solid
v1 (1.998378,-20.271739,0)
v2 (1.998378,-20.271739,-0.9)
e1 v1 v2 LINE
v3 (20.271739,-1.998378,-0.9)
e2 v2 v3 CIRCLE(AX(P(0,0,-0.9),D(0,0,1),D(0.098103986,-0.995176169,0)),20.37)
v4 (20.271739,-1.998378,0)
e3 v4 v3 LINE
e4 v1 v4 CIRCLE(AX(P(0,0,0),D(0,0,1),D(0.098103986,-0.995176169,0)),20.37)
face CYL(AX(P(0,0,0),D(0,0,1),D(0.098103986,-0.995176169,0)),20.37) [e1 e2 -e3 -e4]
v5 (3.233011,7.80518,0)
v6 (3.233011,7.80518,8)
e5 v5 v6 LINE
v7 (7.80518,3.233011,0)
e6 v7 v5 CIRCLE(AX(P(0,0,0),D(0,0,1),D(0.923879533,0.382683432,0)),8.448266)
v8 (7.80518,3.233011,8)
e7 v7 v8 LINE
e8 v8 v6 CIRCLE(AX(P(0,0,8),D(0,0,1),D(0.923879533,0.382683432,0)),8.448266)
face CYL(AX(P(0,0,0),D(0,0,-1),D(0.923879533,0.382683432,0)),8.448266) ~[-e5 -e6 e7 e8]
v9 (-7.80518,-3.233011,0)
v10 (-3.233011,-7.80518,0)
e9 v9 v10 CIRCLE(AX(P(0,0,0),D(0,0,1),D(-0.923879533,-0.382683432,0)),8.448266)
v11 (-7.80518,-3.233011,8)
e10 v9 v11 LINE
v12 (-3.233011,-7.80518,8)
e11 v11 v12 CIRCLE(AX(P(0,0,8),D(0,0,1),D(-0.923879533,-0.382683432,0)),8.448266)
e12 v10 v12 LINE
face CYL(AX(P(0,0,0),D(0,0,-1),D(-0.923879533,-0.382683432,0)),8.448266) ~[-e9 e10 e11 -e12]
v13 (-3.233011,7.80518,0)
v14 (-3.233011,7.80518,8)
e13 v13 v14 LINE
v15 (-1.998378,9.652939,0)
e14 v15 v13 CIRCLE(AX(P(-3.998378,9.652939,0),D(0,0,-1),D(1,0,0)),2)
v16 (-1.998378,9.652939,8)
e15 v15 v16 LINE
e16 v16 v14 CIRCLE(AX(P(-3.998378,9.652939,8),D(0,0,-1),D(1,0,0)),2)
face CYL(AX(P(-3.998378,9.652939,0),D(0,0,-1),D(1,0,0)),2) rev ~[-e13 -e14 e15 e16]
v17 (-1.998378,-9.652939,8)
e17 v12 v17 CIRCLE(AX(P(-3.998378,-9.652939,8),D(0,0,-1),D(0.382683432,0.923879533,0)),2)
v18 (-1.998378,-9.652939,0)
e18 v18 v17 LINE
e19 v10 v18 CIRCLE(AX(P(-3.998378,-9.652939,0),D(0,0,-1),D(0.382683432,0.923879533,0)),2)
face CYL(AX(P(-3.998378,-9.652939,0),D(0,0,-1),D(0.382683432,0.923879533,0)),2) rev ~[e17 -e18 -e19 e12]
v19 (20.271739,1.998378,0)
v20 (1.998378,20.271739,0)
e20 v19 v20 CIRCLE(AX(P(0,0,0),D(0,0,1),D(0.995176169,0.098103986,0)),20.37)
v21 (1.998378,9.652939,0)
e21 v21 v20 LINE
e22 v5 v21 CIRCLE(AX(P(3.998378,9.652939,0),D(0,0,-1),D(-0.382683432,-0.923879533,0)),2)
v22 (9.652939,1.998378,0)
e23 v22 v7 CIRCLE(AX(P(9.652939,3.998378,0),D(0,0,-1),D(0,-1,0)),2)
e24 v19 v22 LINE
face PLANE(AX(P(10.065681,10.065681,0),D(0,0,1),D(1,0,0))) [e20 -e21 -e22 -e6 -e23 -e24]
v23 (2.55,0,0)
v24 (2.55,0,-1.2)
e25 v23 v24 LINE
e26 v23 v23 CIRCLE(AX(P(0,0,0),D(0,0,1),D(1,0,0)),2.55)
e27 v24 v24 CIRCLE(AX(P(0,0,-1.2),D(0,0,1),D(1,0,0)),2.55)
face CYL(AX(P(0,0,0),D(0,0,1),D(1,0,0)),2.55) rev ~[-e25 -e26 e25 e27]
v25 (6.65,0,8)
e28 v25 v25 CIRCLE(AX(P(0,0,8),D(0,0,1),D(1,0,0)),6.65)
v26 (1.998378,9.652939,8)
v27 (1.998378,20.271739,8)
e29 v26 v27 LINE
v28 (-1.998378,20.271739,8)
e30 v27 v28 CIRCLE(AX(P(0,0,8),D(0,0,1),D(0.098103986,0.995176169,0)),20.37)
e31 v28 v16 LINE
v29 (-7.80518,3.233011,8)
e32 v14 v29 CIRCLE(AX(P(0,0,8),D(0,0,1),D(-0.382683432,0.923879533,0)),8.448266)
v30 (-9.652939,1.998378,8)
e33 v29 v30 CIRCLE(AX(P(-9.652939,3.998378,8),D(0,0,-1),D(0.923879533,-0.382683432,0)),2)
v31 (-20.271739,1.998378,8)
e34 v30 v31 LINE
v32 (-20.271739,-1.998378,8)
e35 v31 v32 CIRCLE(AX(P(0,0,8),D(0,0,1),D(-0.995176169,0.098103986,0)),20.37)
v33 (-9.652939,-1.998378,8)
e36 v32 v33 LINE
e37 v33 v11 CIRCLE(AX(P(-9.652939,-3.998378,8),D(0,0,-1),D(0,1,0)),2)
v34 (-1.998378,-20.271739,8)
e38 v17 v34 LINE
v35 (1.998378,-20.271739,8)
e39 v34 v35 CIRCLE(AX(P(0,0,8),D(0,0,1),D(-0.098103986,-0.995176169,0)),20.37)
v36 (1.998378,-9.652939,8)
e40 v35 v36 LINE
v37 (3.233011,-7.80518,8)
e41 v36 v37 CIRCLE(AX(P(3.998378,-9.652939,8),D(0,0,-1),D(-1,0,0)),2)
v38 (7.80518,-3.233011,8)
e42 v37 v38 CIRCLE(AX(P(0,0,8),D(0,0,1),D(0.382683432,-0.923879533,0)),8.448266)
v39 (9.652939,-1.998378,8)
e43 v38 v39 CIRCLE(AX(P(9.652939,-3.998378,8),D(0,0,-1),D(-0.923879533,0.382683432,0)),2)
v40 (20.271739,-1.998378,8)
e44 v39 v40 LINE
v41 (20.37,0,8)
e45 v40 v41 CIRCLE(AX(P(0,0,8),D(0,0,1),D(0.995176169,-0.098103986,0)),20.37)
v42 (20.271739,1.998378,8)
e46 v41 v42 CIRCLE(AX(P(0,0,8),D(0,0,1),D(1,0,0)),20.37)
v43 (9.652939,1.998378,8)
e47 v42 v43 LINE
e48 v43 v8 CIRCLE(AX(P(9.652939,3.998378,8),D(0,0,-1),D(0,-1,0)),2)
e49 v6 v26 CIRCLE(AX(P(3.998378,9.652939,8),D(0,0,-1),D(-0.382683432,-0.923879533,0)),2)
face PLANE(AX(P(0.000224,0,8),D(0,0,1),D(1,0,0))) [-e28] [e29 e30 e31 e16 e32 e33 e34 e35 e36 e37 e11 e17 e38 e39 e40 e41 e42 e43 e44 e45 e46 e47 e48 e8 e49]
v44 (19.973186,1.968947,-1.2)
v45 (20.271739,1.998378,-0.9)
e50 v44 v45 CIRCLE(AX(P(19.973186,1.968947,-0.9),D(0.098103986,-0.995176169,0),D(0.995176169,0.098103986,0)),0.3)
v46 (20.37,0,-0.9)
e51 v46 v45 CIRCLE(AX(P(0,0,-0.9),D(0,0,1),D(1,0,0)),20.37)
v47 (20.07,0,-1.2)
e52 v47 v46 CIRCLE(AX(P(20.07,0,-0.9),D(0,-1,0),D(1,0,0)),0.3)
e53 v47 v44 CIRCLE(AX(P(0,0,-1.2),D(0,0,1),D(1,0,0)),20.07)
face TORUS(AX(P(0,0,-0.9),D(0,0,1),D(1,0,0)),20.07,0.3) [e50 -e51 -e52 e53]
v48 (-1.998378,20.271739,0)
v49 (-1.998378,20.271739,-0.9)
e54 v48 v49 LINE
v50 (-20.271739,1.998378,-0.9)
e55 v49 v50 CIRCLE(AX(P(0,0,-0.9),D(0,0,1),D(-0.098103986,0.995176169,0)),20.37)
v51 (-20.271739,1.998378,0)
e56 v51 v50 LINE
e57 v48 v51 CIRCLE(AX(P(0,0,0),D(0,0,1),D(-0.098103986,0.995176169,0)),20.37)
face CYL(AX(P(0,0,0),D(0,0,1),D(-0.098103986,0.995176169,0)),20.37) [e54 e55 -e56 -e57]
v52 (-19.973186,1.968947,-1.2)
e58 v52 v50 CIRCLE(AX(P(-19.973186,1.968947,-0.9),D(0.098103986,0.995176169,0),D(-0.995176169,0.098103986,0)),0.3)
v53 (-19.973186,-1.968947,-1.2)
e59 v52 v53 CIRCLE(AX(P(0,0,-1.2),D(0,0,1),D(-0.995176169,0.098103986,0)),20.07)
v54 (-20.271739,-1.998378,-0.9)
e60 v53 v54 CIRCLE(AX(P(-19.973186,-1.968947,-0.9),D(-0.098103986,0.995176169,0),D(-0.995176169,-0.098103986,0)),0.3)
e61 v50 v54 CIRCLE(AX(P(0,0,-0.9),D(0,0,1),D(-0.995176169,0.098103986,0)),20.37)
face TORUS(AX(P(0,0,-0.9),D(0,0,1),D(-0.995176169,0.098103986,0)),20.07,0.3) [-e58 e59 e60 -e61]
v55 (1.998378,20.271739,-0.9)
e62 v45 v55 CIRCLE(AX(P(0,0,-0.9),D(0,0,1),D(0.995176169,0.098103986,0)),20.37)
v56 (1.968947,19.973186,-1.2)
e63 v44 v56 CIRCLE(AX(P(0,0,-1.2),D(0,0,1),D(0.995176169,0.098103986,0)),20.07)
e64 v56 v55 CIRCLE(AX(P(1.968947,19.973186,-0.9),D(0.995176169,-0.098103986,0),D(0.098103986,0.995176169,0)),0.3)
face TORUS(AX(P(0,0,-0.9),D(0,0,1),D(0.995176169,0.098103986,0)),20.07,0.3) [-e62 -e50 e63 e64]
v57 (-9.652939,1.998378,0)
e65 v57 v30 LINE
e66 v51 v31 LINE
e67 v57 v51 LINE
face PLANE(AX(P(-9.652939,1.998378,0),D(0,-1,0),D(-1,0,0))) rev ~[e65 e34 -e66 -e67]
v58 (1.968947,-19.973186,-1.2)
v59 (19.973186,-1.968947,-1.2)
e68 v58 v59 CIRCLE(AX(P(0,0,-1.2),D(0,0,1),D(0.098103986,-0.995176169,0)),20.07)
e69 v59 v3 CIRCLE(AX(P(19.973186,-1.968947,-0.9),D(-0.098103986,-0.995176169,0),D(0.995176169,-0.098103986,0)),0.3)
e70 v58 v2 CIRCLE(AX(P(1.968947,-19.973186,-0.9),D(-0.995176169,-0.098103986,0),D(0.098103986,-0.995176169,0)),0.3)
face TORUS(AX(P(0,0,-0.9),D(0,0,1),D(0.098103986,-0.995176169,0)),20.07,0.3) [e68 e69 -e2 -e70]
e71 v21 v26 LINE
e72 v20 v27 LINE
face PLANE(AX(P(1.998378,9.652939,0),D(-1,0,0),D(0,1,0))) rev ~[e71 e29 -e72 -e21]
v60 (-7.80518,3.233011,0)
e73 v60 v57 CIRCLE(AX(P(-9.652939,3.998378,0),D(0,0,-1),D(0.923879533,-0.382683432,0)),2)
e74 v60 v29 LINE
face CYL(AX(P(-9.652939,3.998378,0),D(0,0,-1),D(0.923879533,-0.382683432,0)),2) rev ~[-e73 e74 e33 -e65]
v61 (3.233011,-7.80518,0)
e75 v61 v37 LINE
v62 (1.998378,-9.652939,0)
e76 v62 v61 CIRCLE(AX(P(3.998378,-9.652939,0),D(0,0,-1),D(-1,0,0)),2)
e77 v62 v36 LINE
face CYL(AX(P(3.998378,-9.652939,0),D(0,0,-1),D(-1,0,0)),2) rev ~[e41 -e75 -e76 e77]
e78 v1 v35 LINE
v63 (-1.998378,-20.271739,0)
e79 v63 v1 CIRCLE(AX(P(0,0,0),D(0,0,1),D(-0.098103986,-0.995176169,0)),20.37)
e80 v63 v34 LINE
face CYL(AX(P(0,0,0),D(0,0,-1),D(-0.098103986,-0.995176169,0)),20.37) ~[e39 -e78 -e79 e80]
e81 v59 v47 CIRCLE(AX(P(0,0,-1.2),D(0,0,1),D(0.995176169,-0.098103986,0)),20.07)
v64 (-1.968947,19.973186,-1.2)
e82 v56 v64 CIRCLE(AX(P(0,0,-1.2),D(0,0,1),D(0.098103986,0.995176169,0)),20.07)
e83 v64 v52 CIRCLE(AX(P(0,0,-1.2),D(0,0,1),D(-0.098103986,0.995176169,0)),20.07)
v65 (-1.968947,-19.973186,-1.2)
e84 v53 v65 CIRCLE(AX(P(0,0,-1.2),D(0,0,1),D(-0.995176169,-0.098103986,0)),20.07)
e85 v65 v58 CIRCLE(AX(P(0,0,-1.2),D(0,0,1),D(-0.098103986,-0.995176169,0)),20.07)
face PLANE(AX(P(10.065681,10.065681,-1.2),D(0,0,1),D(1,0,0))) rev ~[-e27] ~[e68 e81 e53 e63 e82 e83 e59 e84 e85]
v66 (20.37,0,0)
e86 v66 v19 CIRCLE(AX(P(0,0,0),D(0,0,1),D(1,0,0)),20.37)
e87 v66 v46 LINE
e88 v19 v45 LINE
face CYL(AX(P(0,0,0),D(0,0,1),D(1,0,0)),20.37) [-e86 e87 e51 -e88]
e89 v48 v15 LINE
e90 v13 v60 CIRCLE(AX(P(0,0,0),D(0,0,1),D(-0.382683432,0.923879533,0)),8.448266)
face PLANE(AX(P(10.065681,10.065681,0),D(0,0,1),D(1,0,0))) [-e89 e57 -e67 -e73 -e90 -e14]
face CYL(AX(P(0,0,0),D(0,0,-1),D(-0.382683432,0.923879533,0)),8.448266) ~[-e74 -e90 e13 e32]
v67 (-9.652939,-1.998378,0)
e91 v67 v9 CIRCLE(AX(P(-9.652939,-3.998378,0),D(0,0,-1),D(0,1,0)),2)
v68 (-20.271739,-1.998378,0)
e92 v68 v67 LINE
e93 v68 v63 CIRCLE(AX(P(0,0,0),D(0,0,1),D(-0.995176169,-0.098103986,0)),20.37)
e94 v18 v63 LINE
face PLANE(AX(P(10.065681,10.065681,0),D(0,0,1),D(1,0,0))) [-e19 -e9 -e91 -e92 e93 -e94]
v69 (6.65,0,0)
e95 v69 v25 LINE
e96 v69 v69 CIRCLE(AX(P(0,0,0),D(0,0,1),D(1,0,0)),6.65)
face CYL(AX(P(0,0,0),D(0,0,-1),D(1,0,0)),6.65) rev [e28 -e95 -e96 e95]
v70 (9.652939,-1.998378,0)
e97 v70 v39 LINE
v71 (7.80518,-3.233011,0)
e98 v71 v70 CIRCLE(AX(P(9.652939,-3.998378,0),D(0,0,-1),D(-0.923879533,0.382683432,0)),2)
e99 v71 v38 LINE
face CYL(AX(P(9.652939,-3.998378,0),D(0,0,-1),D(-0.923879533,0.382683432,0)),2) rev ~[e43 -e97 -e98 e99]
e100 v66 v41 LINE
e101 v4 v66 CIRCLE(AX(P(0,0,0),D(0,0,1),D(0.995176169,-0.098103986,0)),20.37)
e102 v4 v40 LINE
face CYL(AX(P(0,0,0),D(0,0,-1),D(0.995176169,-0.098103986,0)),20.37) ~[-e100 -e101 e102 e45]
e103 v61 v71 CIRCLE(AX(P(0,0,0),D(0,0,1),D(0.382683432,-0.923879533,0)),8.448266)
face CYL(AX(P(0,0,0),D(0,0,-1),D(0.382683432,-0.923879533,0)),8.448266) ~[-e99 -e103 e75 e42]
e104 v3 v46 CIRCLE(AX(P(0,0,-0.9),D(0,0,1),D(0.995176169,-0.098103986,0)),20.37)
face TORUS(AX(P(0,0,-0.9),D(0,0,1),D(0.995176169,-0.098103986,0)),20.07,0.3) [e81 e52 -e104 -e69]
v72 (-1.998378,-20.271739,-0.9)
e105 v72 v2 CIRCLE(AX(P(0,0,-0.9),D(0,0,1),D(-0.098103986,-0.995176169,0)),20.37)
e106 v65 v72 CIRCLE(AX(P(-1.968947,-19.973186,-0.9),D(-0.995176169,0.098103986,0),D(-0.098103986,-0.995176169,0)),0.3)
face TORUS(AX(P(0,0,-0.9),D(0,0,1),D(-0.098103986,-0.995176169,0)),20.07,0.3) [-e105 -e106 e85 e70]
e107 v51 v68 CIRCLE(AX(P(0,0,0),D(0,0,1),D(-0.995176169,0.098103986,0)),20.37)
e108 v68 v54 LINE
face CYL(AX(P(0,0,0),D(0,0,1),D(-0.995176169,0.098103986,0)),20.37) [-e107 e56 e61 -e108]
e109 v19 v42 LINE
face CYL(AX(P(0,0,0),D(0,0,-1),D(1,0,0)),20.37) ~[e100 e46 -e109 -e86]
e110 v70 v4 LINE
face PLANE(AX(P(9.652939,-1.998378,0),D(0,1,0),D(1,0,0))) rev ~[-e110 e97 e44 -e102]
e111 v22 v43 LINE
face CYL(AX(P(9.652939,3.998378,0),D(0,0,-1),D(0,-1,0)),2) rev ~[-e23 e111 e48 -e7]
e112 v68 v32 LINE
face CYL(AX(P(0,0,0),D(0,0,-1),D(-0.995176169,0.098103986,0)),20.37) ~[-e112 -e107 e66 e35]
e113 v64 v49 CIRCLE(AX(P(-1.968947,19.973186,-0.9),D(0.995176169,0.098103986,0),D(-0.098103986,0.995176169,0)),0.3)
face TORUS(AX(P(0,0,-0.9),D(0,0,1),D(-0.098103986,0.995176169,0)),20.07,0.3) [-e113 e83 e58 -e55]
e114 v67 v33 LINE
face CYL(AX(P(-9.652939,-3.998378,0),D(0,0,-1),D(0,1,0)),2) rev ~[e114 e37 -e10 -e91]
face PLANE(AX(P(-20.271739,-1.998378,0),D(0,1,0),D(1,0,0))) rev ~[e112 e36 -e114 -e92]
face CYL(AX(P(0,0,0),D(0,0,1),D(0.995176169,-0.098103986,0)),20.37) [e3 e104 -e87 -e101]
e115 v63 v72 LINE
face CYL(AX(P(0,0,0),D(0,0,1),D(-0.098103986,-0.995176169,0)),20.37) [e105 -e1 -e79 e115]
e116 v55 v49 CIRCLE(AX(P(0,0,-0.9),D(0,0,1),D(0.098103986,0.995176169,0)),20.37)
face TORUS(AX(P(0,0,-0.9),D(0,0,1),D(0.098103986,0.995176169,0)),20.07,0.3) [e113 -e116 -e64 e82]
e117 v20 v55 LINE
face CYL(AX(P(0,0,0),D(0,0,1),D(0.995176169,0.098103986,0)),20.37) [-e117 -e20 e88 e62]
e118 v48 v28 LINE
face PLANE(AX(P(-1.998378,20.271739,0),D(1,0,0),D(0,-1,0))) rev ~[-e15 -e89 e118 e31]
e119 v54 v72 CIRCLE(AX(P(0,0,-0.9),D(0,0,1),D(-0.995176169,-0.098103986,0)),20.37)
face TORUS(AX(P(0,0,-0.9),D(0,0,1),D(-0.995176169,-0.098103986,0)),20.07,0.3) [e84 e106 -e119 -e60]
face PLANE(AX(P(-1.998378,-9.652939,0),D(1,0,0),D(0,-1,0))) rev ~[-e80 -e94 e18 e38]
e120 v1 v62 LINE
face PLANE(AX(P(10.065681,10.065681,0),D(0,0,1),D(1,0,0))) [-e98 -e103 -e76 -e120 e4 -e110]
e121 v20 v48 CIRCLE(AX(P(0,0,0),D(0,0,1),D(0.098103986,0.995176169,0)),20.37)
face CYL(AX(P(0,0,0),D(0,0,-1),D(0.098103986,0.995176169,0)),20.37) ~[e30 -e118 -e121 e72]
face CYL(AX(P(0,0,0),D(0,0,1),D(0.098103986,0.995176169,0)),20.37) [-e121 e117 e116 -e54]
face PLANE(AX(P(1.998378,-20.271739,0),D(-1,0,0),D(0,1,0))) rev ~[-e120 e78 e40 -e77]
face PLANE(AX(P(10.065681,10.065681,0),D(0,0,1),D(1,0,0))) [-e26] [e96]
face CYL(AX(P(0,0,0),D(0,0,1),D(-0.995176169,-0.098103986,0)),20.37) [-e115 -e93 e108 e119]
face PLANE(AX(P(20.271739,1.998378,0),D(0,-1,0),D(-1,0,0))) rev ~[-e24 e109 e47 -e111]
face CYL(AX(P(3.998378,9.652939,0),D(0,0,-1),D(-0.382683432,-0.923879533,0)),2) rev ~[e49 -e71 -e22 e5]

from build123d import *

# Parameters (mm, degrees)
F0_R     = 6.65
F0_R_2   = 2.55
F1_DEPTH = 1.2
F2_DEPTH = 8
F3_R     = 0.3


# Not quite as in the source:
# - a feature names something its author has since deleted; it is built from what else it names


with BuildPart() as f1:
    # F0 (on Top) → F1 (new body)
    with BuildSketch(Plane.XY):
        with BuildLine():
            Line((9.6529388756, 1.998378199), (20.2717385681, 1.998378199))
            ThreePointArc((20.2717385681, 1.998378199), (14.4037651328, 14.4037651328), (1.998378199, 20.2717385681))
            Line((1.998378199, 20.2717385681), (1.998378199, 9.6529388756))
            ThreePointArc((1.998378199, 9.6529388756), (2.3354389744, 8.5417984096), (3.2330113343, 7.8051798106))
            ThreePointArc((3.2330113343, 7.8051798106), (5.9738260003, 5.9738260003), (7.8051798106, 3.2330113343))
            ThreePointArc((7.8051798106, 3.2330113343), (8.5417984096, 2.3354389744), (9.6529388756, 1.998378199))
        make_face()
        with BuildLine():
            Line((-1.998378199, 9.6529388756), (-1.998378199, 20.2717385681))
            ThreePointArc((-1.998378199, 20.2717385681), (-14.4037651328, 14.4037651328), (-20.2717385681, 1.998378199))
            Line((-20.2717385681, 1.998378199), (-9.6529388756, 1.998378199))
            ThreePointArc((-9.6529388756, 1.998378199), (-8.5417984096, 2.3354389744), (-7.8051798106, 3.2330113343))
            ThreePointArc((-7.8051798106, 3.2330113343), (-5.9738260003, 5.9738260003), (-3.2330113343, 7.8051798106))
            ThreePointArc((-3.2330113343, 7.8051798106), (-2.3354389744, 8.5417984096), (-1.998378199, 9.6529388756))
        make_face()
        with BuildLine():
            ThreePointArc((-20.2717385681, -1.998378199), (-14.4037651328, -14.4037651328), (-1.998378199, -20.2717385681))
            Line((-1.998378199, -20.2717385681), (-1.998378199, -9.6529388756))
            ThreePointArc((-1.998378199, -9.6529388756), (-2.3354389744, -8.5417984096), (-3.2330113343, -7.8051798106))
            ThreePointArc((-3.2330113343, -7.8051798106), (-5.9738260003, -5.9738260003), (-7.8051798106, -3.2330113343))
            ThreePointArc((-7.8051798106, -3.2330113343), (-8.5417984096, -2.3354389744), (-9.6529388756, -1.998378199))
            Line((-9.6529388756, -1.998378199), (-20.2717385681, -1.998378199))
        make_face()
        with BuildLine():
            ThreePointArc((1.998378199, -20.2717385681), (14.4037651328, -14.4037651328), (20.2717385681, -1.998378199))
            Line((20.2717385681, -1.998378199), (9.6529388756, -1.998378199))
            ThreePointArc((9.6529388756, -1.998378199), (8.5417984096, -2.3354389744), (7.8051798106, -3.2330113343))
            ThreePointArc((7.8051798106, -3.2330113343), (5.9738260003, -5.9738260003), (3.2330113343, -7.8051798106))
            ThreePointArc((3.2330113343, -7.8051798106), (2.3354389744, -8.5417984096), (1.998378199, -9.6529388756))
            Line((1.998378199, -9.6529388756), (1.998378199, -20.2717385681))
        make_face()
        with BuildLine():
            ThreePointArc((20.2717385681, -1.998378199), (20.3454198117, -1.0003962634), (20.37, 0))
            ThreePointArc((20.37, 0), (20.3454198117, 1.0003962634), (20.2717385681, 1.998378199))
            Line((20.2717385681, 1.998378199), (9.6529388756, 1.998378199))
            ThreePointArc((9.6529388756, 1.998378199), (8.5417984096, 2.3354389744), (7.8051798106, 3.2330113343))
            ThreePointArc((7.8051798106, 3.2330113343), (5.9738260003, 5.9738260003), (3.2330113343, 7.8051798106))
            ThreePointArc((3.2330113343, 7.8051798106), (2.3354389744, 8.5417984096), (1.998378199, 9.6529388756))
            Line((1.998378199, 9.6529388756), (1.998378199, 20.2717385681))
            ThreePointArc((1.998378199, 20.2717385681), (0, 20.37), (-1.998378199, 20.2717385681))
            Line((-1.998378199, 20.2717385681), (-1.998378199, 9.6529388756))
            ThreePointArc((-1.998378199, 9.6529388756), (-2.3354389744, 8.5417984096), (-3.2330113343, 7.8051798106))
            ThreePointArc((-3.2330113343, 7.8051798106), (-5.9738260003, 5.9738260003), (-7.8051798106, 3.2330113343))
            ThreePointArc((-7.8051798106, 3.2330113343), (-8.5417984096, 2.3354389744), (-9.6529388756, 1.998378199))
            Line((-9.6529388756, 1.998378199), (-20.2717385681, 1.998378199))
            ThreePointArc((-20.2717385681, 1.998378199), (-20.37, 0), (-20.2717385681, -1.998378199))
            Line((-20.2717385681, -1.998378199), (-9.6529388756, -1.998378199))
            ThreePointArc((-9.6529388756, -1.998378199), (-8.5417984096, -2.3354389744), (-7.8051798106, -3.2330113343))
            ThreePointArc((-7.8051798106, -3.2330113343), (-5.9738260003, -5.9738260003), (-3.2330113343, -7.8051798106))
            ThreePointArc((-3.2330113343, -7.8051798106), (-2.3354389744, -8.5417984096), (-1.998378199, -9.6529388756))
            Line((-1.998378199, -9.6529388756), (-1.998378199, -20.2717385681))
            ThreePointArc((-1.998378199, -20.2717385681), (0, -20.37), (1.998378199, -20.2717385681))
            Line((1.998378199, -20.2717385681), (1.998378199, -9.6529388756))
            ThreePointArc((1.998378199, -9.6529388756), (2.3354389744, -8.5417984096), (3.2330113343, -7.8051798106))
            ThreePointArc((3.2330113343, -7.8051798106), (5.9738260003, -5.9738260003), (7.8051798106, -3.2330113343))
            ThreePointArc((7.8051798106, -3.2330113343), (8.5417984096, -2.3354389744), (9.6529388756, -1.998378199))
            Line((9.6529388756, -1.998378199), (20.2717385681, -1.998378199))
        make_face()
        Circle(F0_R, mode=Mode.SUBTRACT)
        Circle(F0_R)
        Circle(F0_R_2, mode=Mode.SUBTRACT)
    extrude(amount=-F1_DEPTH)

    # F0 (on Top) → F2 (join)
    with BuildSketch(Plane.XY):
        with BuildLine():
            ThreePointArc((20.2717385681, -1.998378199), (20.3454198117, -1.0003962634), (20.37, 0))
            ThreePointArc((20.37, 0), (20.3454198117, 1.0003962634), (20.2717385681, 1.998378199))
            Line((20.2717385681, 1.998378199), (9.6529388756, 1.998378199))
            ThreePointArc((9.6529388756, 1.998378199), (8.5417984096, 2.3354389744), (7.8051798106, 3.2330113343))
            ThreePointArc((7.8051798106, 3.2330113343), (5.9738260003, 5.9738260003), (3.2330113343, 7.8051798106))
            ThreePointArc((3.2330113343, 7.8051798106), (2.3354389744, 8.5417984096), (1.998378199, 9.6529388756))
            Line((1.998378199, 9.6529388756), (1.998378199, 20.2717385681))
            ThreePointArc((1.998378199, 20.2717385681), (0, 20.37), (-1.998378199, 20.2717385681))
            Line((-1.998378199, 20.2717385681), (-1.998378199, 9.6529388756))
            ThreePointArc((-1.998378199, 9.6529388756), (-2.3354389744, 8.5417984096), (-3.2330113343, 7.8051798106))
            ThreePointArc((-3.2330113343, 7.8051798106), (-5.9738260003, 5.9738260003), (-7.8051798106, 3.2330113343))
            ThreePointArc((-7.8051798106, 3.2330113343), (-8.5417984096, 2.3354389744), (-9.6529388756, 1.998378199))
            Line((-9.6529388756, 1.998378199), (-20.2717385681, 1.998378199))
            ThreePointArc((-20.2717385681, 1.998378199), (-20.37, 0), (-20.2717385681, -1.998378199))
            Line((-20.2717385681, -1.998378199), (-9.6529388756, -1.998378199))
            ThreePointArc((-9.6529388756, -1.998378199), (-8.5417984096, -2.3354389744), (-7.8051798106, -3.2330113343))
            ThreePointArc((-7.8051798106, -3.2330113343), (-5.9738260003, -5.9738260003), (-3.2330113343, -7.8051798106))
            ThreePointArc((-3.2330113343, -7.8051798106), (-2.3354389744, -8.5417984096), (-1.998378199, -9.6529388756))
            Line((-1.998378199, -9.6529388756), (-1.998378199, -20.2717385681))
            ThreePointArc((-1.998378199, -20.2717385681), (0, -20.37), (1.998378199, -20.2717385681))
            Line((1.998378199, -20.2717385681), (1.998378199, -9.6529388756))
            ThreePointArc((1.998378199, -9.6529388756), (2.3354389744, -8.5417984096), (3.2330113343, -7.8051798106))
            ThreePointArc((3.2330113343, -7.8051798106), (5.9738260003, -5.9738260003), (7.8051798106, -3.2330113343))
            ThreePointArc((7.8051798106, -3.2330113343), (8.5417984096, -2.3354389744), (9.6529388756, -1.998378199))
            Line((9.6529388756, -1.998378199), (20.2717385681, -1.998378199))
        make_face()
        Circle(F0_R, mode=Mode.SUBTRACT)
    extrude(amount=F2_DEPTH)

    # F3
    f3_edges = [f1.edges().sort_by_distance(p)[0] for p in [
        (-1.998378, -20.271739, -1.2),
    ]]
    fillet(f3_edges, radius=F3_R)


solid = f1.part
